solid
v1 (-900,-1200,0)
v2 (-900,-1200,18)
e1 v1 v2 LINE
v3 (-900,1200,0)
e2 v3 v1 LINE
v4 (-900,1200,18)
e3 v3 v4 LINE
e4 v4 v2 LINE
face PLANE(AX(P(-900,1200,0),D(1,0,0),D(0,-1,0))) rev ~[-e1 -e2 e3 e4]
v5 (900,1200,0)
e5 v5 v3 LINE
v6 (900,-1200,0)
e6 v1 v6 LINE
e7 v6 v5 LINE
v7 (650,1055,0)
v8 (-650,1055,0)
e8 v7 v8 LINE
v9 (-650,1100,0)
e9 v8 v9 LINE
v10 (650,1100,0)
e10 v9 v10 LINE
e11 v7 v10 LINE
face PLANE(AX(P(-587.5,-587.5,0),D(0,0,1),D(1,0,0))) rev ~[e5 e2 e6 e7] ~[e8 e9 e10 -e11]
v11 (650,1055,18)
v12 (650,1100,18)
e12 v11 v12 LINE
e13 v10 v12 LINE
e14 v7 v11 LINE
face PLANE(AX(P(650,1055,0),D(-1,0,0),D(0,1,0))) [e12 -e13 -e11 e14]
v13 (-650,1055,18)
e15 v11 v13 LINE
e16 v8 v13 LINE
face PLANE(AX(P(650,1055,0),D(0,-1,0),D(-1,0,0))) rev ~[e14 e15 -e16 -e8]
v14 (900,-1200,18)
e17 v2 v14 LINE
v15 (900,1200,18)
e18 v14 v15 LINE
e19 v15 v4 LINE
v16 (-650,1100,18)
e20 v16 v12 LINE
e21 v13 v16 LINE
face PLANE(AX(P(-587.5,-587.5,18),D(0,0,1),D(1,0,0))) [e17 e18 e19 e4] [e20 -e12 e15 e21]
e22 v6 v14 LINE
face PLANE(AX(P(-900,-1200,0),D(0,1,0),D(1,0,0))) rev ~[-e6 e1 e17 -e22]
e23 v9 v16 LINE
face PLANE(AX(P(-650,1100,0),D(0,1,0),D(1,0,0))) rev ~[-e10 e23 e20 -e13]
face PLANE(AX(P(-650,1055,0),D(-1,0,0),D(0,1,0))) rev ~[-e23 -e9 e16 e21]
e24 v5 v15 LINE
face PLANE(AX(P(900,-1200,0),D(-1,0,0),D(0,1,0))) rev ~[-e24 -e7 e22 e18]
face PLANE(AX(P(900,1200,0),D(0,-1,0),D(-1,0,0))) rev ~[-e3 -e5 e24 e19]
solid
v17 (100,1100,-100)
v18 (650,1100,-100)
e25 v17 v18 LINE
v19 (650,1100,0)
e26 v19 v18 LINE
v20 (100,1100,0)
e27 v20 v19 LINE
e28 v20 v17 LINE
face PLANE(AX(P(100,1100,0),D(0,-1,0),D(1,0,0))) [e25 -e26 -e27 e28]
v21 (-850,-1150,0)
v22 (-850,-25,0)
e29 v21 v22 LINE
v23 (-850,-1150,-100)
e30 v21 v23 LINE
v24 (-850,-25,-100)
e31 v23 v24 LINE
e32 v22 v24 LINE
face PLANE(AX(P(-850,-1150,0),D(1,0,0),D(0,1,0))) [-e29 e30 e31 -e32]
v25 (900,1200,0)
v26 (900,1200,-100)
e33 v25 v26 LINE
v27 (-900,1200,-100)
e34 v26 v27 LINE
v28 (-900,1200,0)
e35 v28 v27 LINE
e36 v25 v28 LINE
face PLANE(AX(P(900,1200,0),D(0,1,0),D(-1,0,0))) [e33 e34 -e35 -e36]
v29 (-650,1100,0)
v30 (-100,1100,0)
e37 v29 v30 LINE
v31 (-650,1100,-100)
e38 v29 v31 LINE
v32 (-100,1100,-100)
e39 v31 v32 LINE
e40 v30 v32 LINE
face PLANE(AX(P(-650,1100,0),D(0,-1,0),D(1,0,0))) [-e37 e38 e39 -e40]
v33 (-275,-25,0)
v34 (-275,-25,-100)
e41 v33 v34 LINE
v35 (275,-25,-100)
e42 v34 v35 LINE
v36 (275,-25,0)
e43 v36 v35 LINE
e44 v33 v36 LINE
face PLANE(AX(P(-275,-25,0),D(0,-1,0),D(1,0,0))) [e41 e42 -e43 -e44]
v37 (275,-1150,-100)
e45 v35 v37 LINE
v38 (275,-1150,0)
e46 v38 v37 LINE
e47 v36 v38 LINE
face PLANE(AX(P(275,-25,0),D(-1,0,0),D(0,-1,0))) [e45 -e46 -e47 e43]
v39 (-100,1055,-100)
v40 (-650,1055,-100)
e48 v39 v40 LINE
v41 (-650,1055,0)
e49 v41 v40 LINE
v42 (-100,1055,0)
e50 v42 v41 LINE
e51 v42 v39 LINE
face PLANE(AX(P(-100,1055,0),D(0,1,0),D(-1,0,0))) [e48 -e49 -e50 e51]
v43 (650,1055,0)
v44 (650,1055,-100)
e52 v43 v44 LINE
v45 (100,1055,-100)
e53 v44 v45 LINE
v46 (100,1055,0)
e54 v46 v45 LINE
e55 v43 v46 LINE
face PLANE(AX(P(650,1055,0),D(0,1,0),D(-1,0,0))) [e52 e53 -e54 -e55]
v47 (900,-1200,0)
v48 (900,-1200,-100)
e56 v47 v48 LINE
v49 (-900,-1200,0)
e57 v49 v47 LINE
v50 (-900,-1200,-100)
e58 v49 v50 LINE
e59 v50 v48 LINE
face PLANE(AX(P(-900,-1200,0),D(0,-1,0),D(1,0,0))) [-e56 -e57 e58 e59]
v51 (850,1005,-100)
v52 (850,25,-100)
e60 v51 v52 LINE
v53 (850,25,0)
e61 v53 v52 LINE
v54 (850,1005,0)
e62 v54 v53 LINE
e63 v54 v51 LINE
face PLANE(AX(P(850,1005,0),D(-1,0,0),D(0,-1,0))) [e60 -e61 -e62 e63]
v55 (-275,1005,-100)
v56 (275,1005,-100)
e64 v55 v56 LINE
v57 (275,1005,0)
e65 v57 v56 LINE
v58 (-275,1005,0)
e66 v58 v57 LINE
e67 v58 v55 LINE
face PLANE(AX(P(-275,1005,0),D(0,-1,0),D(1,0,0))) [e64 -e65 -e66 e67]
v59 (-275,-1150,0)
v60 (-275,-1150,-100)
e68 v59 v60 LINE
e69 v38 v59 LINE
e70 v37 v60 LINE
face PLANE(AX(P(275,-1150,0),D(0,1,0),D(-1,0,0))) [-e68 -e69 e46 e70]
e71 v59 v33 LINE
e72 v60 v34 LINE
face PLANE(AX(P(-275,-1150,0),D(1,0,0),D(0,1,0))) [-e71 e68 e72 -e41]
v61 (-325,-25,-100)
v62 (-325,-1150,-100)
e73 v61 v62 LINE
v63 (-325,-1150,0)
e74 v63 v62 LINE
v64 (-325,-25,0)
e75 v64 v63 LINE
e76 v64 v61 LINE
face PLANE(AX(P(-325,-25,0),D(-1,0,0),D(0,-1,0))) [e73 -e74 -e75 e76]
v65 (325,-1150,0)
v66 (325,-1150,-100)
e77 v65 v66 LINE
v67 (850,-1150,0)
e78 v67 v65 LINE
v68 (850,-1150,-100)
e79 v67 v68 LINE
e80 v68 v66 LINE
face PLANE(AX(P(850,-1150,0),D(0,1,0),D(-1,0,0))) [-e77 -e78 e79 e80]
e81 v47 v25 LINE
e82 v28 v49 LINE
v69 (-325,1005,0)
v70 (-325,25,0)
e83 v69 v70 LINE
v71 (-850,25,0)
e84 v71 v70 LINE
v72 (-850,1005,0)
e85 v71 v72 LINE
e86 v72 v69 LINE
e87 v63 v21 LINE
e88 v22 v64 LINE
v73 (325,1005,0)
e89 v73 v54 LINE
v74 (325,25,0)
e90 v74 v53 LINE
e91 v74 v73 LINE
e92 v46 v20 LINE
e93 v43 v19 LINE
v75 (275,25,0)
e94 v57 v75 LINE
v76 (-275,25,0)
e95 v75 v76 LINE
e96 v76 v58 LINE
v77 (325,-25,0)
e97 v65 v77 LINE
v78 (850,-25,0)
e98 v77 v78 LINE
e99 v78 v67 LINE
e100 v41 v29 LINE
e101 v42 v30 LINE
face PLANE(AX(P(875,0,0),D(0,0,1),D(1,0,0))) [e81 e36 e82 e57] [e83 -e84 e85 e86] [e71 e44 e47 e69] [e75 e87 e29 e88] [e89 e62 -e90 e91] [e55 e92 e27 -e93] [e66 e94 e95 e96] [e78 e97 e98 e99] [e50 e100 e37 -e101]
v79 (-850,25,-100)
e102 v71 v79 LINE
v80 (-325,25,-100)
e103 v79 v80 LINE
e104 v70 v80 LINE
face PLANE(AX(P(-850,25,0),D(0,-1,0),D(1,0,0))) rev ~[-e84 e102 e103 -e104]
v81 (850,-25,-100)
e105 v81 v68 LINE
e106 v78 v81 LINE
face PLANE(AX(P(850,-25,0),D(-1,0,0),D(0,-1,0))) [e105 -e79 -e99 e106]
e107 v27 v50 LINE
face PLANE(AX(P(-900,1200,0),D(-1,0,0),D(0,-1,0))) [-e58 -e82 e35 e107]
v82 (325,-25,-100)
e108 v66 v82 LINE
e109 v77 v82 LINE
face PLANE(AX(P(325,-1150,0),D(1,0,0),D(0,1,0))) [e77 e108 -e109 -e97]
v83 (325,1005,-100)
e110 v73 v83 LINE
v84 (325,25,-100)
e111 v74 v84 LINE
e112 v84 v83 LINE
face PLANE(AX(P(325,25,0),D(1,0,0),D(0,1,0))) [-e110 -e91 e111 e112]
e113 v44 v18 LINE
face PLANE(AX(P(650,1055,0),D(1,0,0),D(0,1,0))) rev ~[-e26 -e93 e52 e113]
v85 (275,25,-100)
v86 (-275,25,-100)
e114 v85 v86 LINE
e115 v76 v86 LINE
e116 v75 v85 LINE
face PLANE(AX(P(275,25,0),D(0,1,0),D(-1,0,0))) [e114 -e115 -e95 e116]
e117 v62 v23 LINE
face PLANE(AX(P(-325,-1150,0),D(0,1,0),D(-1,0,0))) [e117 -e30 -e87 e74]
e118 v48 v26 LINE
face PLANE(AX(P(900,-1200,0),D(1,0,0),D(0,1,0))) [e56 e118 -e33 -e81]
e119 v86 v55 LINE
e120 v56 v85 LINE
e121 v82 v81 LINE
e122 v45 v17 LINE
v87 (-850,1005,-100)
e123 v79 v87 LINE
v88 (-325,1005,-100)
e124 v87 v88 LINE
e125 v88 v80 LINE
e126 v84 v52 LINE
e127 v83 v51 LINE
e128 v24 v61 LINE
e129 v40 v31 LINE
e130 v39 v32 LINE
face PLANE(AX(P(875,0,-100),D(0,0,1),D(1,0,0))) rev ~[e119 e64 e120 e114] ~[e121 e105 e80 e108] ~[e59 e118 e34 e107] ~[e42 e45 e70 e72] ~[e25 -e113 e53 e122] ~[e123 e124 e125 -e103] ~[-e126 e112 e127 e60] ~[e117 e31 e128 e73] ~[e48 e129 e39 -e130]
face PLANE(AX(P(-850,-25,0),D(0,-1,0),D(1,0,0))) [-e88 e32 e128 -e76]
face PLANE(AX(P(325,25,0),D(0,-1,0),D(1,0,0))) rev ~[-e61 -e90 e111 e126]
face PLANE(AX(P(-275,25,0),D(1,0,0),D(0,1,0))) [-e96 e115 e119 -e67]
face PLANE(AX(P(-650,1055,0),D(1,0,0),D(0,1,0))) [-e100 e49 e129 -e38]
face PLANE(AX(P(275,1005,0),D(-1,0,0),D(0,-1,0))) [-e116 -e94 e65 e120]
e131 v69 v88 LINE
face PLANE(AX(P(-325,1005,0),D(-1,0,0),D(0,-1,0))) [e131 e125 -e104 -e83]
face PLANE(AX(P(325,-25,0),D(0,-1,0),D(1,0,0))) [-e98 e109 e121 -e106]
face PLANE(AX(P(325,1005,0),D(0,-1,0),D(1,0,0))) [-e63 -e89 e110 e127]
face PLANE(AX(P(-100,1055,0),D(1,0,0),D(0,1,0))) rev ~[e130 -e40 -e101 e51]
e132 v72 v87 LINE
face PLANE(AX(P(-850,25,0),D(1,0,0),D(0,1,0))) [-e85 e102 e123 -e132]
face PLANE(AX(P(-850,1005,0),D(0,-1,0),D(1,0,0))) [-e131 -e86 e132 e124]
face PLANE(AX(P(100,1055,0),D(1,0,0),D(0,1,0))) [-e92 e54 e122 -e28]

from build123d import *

# Parameters (mm, degrees)
F0_W     = 525
F0_H     = 50
F0_W_2   = 200
F0_H_2   = 45
F1_DEPTH = 100
F0_H_3   = 1125
F0_H_4   = 980
F2_DEPTH = 18


# Not quite as in the source:
# - a feature names something its author has since deleted; it is built from what else it names


with BuildPart() as f1:
    # F0 (on Top) → F1 (new body)
    with BuildSketch(Plane.XY):
        Polygon((850, -1150), (900, -1150), (900, 1150), (850, 1150), (850, 1100), (850, 1055), (850, 1005), (850, 25), (850, -25), align=None)
        Polygon((-900, -1200), (900, -1200), (900, -1150), (850, -1150), (325, -1150), (275, -1150), (-275, -1150), (-325, -1150), (-850, -1150), (-900, -1150), align=None)
        Polygon((-900, 1150), (-900, -1150), (-850, -1150), (-850, -25), (-850, 25), (-850, 1005), (-850, 1055), (-850, 1100), (-850, 1150), align=None)
        with Locations((-587.5, 0)):
            Rectangle(F0_W, F0_H)
        Polygon((0, -25), (275, -25), (275, 25), (0, 25), (-275, 25), (-275, -25), align=None)
        Polygon((275, -1150), (325, -1150), (325, -25), (325, 25), (325, 1005), (275, 1005), (275, 25), (275, -25), align=None)
        with Locations((587.5, 0)):
            Rectangle(F0_W, F0_H)
        Polygon((850, 1150), (900, 1150), (900, 1200), (-900, 1200), (-900, 1150), (-850, 1150), align=None)
        Polygon((850, 1005), (850, 1055), (650, 1055), (100, 1055), (-100, 1055), (-650, 1055), (-850, 1055), (-850, 1005), (-325, 1005), (-275, 1005), (275, 1005), (325, 1005), align=None)
        Polygon((850, 1100), (850, 1150), (-850, 1150), (-850, 1100), (-650, 1100), (-100, 1100), (100, 1100), (650, 1100), align=None)
        with Locations((-750, 1077.5)):
            Rectangle(F0_W_2, F0_H_2)
        with Locations((0, 1077.5)):
            Rectangle(F0_W_2, F0_H_2)
        with Locations((750, 1077.5)):
            Rectangle(F0_W_2, F0_H_2)
        Polygon((-325, -25), (-325, -1150), (-275, -1150), (-275, -25), (-275, 25), (-275, 1005), (-325, 1005), (-325, 25), align=None)
    extrude(amount=-F1_DEPTH)


with BuildPart() as f2:
    # F0 (on Top) → F2 (new body)
    with BuildSketch(Plane.XY):
        with Locations((-587.5, -587.5)):
            Rectangle(F0_W, F0_H_3)
        Polygon((-275, -1150), (275, -1150), (275, -25), (0, -25), (-275, -25), align=None)
        with Locations((587.5, -587.5)):
            Rectangle(F0_W, F0_H_3)
        with Locations((-587.5, 515)):
            Rectangle(F0_W, F0_H_4)
        Polygon((0, 25), (275, 25), (275, 1005), (-275, 1005), (-275, 25), align=None)
        with Locations((587.5, 515)):
            Rectangle(F0_W, F0_H_4)
        with Locations((750, 1077.5)):
            Rectangle(F0_W_2, F0_H_2)
        Polygon((850, -1150), (900, -1150), (900, 1150), (850, 1150), (850, 1100), (850, 1055), (850, 1005), (850, 25), (850, -25), align=None)
        Polygon((850, 1150), (900, 1150), (900, 1200), (-900, 1200), (-900, 1150), (-850, 1150), align=None)
        Polygon((850, 1100), (850, 1150), (-850, 1150), (-850, 1100), (-650, 1100), (-100, 1100), (100, 1100), (650, 1100), align=None)
        Polygon((-900, 1150), (-900, -1150), (-850, -1150), (-850, -25), (-850, 25), (-850, 1005), (-850, 1055), (-850, 1100), (-850, 1150), align=None)
        with Locations((-750, 1077.5)):
            Rectangle(F0_W_2, F0_H_2)
        Polygon((850, 1005), (850, 1055), (650, 1055), (100, 1055), (-100, 1055), (-650, 1055), (-850, 1055), (-850, 1005), (-325, 1005), (-275, 1005), (275, 1005), (325, 1005), align=None)
        with Locations((-587.5, 0)):
            Rectangle(F0_W, F0_H)
        Polygon((0, -25), (275, -25), (275, 25), (0, 25), (-275, 25), (-275, -25), align=None)
        Polygon((275, -1150), (325, -1150), (325, -25), (325, 25), (325, 1005), (275, 1005), (275, 25), (275, -25), align=None)
        with Locations((587.5, 0)):
            Rectangle(F0_W, F0_H)
        Polygon((-900, -1200), (900, -1200), (900, -1150), (850, -1150), (325, -1150), (275, -1150), (-275, -1150), (-325, -1150), (-850, -1150), (-900, -1150), align=None)
        Polygon((-325, -25), (-325, -1150), (-275, -1150), (-275, -25), (-275, 25), (-275, 1005), (-325, 1005), (-325, 25), align=None)
    extrude(amount=F2_DEPTH)


solid = Compound([f1.part, f2.part])
